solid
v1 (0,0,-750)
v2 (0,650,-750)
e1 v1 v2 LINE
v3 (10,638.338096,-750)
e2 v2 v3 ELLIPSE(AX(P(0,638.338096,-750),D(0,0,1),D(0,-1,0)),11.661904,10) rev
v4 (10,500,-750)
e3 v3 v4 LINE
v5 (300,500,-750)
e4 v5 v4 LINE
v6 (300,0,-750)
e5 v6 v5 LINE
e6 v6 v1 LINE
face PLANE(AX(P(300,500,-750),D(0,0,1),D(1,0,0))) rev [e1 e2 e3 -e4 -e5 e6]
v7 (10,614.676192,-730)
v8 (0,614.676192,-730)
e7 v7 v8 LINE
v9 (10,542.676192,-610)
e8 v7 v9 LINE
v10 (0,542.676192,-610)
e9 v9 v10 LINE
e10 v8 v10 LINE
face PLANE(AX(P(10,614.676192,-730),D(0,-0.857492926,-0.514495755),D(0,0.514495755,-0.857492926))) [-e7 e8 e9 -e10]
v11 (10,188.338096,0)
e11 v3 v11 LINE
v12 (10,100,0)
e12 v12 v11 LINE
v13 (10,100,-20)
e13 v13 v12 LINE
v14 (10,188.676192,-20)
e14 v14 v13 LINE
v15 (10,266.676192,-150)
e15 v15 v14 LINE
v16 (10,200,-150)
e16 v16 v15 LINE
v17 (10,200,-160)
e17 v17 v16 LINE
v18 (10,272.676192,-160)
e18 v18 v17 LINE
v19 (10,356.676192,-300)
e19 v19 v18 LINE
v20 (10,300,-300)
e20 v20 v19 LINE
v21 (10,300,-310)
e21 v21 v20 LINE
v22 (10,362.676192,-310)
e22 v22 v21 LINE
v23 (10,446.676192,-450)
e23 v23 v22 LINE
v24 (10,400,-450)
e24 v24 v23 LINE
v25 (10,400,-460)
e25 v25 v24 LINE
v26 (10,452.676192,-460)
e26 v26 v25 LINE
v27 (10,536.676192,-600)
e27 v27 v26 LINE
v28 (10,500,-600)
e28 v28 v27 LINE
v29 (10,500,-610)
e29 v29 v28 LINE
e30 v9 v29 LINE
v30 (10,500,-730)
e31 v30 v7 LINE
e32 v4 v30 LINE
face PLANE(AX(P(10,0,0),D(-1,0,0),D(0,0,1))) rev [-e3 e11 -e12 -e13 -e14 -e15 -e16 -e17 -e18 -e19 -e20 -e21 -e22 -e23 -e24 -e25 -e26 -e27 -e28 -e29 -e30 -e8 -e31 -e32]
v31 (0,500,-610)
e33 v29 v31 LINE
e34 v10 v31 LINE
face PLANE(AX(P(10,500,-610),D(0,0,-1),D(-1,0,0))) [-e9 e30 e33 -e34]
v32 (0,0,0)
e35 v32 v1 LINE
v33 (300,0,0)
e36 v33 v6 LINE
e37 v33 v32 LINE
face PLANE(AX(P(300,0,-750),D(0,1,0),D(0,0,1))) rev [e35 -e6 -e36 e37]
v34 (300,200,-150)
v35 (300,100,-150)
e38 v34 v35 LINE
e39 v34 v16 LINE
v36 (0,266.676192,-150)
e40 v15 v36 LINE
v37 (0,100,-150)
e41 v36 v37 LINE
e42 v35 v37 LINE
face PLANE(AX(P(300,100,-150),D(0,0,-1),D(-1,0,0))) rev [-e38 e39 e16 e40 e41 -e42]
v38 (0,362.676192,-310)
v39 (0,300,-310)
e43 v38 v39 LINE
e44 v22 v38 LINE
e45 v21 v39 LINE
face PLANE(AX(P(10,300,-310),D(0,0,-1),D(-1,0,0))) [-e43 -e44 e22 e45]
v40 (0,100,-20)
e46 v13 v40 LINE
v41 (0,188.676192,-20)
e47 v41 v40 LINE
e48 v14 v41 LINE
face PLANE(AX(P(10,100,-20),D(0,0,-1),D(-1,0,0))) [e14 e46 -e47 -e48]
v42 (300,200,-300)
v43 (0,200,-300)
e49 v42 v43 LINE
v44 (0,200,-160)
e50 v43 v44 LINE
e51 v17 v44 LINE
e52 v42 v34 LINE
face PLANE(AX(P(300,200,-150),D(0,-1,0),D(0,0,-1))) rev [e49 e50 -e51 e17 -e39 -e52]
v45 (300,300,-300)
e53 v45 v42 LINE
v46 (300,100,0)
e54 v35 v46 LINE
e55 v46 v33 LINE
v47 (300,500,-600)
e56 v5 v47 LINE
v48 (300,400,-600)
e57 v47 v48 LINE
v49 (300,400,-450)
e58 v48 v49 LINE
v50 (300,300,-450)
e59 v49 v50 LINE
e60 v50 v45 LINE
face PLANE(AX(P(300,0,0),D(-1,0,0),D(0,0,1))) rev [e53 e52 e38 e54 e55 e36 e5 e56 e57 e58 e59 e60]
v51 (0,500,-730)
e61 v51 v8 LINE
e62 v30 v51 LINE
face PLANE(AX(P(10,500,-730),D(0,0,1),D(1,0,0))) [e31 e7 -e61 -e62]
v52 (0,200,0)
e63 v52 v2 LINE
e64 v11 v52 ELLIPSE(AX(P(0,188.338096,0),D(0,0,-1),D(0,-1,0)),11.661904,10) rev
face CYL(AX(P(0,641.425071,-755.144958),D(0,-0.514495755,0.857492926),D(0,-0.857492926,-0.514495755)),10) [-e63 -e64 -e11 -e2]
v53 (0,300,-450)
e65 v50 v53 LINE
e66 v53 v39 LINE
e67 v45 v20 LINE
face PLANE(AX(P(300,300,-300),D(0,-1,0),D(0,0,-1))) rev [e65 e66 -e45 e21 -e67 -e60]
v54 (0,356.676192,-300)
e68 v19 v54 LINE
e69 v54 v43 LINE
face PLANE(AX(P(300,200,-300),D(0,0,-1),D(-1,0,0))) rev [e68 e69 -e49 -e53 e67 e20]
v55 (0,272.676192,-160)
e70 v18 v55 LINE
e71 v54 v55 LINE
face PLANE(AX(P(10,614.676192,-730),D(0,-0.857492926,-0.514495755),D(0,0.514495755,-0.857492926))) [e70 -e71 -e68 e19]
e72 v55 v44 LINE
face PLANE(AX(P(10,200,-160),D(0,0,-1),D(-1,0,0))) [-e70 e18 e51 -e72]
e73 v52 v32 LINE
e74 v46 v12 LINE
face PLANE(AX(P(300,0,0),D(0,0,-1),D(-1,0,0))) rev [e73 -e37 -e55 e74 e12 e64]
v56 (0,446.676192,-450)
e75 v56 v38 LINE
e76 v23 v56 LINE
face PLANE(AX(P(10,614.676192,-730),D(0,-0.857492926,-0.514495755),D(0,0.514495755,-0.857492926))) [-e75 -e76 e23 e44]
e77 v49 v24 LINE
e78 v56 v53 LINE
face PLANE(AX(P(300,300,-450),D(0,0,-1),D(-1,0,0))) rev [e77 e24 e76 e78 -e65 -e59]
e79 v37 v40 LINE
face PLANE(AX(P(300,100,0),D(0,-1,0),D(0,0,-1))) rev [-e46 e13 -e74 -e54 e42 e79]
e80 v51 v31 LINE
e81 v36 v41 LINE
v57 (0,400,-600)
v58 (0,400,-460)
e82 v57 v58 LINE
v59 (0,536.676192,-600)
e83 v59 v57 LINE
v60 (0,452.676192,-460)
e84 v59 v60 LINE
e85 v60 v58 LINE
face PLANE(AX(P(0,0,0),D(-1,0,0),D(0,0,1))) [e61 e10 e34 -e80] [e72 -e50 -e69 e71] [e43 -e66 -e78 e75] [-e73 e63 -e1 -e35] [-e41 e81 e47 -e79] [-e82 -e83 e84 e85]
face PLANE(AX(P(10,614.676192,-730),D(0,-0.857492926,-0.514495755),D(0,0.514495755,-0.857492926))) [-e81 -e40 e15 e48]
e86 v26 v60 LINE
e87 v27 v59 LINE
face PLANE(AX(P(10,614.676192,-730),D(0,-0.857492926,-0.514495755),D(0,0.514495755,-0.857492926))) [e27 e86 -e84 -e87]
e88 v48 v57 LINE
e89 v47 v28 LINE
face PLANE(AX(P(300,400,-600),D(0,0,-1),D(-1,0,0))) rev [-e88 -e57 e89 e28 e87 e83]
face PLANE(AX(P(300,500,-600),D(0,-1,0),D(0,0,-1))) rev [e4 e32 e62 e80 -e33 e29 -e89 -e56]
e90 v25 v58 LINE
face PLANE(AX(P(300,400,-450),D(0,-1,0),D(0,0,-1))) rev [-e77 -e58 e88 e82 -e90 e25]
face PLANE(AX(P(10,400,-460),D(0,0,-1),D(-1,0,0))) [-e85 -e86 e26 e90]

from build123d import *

# Parameters (mm, degrees)
BOSS_EXTRUDE1_DEPTH = 300
BOSS_EXTRUDE4_DEPTH = 10
BOSS_EXTRUDE5_DEPTH = 10
FILLET1_R           = 10


with BuildPart() as part:
    # Sketch1 → Boss-Extrude1 (new body)
    with BuildSketch(Plane(origin=(0, 0, 0), x_dir=(0, 0, -1), z_dir=(1, 0, 0))):
        Polygon((0, 0), (0, 100), (150, 100), (150, 200), (300, 200), (300, 300), (450, 300), (450, 400), (600, 400), (600, 500), (750, 500), (750, 0), align=None)
    extrude(amount=BOSS_EXTRUDE1_DEPTH)

    # Sketch5 → Boss-Extrude4 (add)
    with BuildSketch(Plane.ZY):
        Polygon((-750, 500), (-750, 650), (0, 200), (0, 100), (-20, 100), (-20, 188.676192421), (-730, 614.676192421), (-730, 500), align=None)
    extrude(amount=-BOSS_EXTRUDE4_DEPTH)

    # Sketch8 → Boss-Extrude5 (add)
    with BuildSketch(Plane.ZY):
        Polygon((-600, 500), (-600, 536.676192421), (-610, 542.676192421), (-610, 536.676192421), (-610, 500), align=None)
        Polygon((-450, 400), (-450, 446.676192421), (-460, 452.676192421), (-460, 446.676192421), (-460, 400), align=None)
        Polygon((-300, 300), (-300, 356.676192421), (-310, 362.676192421), (-310, 356.676192421), (-310, 300), align=None)
        Polygon((-150, 200), (-150, 266.676192421), (-160, 272.676192421), (-160, 266.676192421), (-160, 200), align=None)
    extrude(amount=-BOSS_EXTRUDE5_DEPTH)

    # Fillet1
    fillet1_edges = [part.edges().sort_by_distance(p)[0] for p in [
        (10, 425, -375),
    ]]
    fillet(fillet1_edges, radius=FILLET1_R - 0.0001)  # a hair under: the kernel refuses the full size


solid = part.part
